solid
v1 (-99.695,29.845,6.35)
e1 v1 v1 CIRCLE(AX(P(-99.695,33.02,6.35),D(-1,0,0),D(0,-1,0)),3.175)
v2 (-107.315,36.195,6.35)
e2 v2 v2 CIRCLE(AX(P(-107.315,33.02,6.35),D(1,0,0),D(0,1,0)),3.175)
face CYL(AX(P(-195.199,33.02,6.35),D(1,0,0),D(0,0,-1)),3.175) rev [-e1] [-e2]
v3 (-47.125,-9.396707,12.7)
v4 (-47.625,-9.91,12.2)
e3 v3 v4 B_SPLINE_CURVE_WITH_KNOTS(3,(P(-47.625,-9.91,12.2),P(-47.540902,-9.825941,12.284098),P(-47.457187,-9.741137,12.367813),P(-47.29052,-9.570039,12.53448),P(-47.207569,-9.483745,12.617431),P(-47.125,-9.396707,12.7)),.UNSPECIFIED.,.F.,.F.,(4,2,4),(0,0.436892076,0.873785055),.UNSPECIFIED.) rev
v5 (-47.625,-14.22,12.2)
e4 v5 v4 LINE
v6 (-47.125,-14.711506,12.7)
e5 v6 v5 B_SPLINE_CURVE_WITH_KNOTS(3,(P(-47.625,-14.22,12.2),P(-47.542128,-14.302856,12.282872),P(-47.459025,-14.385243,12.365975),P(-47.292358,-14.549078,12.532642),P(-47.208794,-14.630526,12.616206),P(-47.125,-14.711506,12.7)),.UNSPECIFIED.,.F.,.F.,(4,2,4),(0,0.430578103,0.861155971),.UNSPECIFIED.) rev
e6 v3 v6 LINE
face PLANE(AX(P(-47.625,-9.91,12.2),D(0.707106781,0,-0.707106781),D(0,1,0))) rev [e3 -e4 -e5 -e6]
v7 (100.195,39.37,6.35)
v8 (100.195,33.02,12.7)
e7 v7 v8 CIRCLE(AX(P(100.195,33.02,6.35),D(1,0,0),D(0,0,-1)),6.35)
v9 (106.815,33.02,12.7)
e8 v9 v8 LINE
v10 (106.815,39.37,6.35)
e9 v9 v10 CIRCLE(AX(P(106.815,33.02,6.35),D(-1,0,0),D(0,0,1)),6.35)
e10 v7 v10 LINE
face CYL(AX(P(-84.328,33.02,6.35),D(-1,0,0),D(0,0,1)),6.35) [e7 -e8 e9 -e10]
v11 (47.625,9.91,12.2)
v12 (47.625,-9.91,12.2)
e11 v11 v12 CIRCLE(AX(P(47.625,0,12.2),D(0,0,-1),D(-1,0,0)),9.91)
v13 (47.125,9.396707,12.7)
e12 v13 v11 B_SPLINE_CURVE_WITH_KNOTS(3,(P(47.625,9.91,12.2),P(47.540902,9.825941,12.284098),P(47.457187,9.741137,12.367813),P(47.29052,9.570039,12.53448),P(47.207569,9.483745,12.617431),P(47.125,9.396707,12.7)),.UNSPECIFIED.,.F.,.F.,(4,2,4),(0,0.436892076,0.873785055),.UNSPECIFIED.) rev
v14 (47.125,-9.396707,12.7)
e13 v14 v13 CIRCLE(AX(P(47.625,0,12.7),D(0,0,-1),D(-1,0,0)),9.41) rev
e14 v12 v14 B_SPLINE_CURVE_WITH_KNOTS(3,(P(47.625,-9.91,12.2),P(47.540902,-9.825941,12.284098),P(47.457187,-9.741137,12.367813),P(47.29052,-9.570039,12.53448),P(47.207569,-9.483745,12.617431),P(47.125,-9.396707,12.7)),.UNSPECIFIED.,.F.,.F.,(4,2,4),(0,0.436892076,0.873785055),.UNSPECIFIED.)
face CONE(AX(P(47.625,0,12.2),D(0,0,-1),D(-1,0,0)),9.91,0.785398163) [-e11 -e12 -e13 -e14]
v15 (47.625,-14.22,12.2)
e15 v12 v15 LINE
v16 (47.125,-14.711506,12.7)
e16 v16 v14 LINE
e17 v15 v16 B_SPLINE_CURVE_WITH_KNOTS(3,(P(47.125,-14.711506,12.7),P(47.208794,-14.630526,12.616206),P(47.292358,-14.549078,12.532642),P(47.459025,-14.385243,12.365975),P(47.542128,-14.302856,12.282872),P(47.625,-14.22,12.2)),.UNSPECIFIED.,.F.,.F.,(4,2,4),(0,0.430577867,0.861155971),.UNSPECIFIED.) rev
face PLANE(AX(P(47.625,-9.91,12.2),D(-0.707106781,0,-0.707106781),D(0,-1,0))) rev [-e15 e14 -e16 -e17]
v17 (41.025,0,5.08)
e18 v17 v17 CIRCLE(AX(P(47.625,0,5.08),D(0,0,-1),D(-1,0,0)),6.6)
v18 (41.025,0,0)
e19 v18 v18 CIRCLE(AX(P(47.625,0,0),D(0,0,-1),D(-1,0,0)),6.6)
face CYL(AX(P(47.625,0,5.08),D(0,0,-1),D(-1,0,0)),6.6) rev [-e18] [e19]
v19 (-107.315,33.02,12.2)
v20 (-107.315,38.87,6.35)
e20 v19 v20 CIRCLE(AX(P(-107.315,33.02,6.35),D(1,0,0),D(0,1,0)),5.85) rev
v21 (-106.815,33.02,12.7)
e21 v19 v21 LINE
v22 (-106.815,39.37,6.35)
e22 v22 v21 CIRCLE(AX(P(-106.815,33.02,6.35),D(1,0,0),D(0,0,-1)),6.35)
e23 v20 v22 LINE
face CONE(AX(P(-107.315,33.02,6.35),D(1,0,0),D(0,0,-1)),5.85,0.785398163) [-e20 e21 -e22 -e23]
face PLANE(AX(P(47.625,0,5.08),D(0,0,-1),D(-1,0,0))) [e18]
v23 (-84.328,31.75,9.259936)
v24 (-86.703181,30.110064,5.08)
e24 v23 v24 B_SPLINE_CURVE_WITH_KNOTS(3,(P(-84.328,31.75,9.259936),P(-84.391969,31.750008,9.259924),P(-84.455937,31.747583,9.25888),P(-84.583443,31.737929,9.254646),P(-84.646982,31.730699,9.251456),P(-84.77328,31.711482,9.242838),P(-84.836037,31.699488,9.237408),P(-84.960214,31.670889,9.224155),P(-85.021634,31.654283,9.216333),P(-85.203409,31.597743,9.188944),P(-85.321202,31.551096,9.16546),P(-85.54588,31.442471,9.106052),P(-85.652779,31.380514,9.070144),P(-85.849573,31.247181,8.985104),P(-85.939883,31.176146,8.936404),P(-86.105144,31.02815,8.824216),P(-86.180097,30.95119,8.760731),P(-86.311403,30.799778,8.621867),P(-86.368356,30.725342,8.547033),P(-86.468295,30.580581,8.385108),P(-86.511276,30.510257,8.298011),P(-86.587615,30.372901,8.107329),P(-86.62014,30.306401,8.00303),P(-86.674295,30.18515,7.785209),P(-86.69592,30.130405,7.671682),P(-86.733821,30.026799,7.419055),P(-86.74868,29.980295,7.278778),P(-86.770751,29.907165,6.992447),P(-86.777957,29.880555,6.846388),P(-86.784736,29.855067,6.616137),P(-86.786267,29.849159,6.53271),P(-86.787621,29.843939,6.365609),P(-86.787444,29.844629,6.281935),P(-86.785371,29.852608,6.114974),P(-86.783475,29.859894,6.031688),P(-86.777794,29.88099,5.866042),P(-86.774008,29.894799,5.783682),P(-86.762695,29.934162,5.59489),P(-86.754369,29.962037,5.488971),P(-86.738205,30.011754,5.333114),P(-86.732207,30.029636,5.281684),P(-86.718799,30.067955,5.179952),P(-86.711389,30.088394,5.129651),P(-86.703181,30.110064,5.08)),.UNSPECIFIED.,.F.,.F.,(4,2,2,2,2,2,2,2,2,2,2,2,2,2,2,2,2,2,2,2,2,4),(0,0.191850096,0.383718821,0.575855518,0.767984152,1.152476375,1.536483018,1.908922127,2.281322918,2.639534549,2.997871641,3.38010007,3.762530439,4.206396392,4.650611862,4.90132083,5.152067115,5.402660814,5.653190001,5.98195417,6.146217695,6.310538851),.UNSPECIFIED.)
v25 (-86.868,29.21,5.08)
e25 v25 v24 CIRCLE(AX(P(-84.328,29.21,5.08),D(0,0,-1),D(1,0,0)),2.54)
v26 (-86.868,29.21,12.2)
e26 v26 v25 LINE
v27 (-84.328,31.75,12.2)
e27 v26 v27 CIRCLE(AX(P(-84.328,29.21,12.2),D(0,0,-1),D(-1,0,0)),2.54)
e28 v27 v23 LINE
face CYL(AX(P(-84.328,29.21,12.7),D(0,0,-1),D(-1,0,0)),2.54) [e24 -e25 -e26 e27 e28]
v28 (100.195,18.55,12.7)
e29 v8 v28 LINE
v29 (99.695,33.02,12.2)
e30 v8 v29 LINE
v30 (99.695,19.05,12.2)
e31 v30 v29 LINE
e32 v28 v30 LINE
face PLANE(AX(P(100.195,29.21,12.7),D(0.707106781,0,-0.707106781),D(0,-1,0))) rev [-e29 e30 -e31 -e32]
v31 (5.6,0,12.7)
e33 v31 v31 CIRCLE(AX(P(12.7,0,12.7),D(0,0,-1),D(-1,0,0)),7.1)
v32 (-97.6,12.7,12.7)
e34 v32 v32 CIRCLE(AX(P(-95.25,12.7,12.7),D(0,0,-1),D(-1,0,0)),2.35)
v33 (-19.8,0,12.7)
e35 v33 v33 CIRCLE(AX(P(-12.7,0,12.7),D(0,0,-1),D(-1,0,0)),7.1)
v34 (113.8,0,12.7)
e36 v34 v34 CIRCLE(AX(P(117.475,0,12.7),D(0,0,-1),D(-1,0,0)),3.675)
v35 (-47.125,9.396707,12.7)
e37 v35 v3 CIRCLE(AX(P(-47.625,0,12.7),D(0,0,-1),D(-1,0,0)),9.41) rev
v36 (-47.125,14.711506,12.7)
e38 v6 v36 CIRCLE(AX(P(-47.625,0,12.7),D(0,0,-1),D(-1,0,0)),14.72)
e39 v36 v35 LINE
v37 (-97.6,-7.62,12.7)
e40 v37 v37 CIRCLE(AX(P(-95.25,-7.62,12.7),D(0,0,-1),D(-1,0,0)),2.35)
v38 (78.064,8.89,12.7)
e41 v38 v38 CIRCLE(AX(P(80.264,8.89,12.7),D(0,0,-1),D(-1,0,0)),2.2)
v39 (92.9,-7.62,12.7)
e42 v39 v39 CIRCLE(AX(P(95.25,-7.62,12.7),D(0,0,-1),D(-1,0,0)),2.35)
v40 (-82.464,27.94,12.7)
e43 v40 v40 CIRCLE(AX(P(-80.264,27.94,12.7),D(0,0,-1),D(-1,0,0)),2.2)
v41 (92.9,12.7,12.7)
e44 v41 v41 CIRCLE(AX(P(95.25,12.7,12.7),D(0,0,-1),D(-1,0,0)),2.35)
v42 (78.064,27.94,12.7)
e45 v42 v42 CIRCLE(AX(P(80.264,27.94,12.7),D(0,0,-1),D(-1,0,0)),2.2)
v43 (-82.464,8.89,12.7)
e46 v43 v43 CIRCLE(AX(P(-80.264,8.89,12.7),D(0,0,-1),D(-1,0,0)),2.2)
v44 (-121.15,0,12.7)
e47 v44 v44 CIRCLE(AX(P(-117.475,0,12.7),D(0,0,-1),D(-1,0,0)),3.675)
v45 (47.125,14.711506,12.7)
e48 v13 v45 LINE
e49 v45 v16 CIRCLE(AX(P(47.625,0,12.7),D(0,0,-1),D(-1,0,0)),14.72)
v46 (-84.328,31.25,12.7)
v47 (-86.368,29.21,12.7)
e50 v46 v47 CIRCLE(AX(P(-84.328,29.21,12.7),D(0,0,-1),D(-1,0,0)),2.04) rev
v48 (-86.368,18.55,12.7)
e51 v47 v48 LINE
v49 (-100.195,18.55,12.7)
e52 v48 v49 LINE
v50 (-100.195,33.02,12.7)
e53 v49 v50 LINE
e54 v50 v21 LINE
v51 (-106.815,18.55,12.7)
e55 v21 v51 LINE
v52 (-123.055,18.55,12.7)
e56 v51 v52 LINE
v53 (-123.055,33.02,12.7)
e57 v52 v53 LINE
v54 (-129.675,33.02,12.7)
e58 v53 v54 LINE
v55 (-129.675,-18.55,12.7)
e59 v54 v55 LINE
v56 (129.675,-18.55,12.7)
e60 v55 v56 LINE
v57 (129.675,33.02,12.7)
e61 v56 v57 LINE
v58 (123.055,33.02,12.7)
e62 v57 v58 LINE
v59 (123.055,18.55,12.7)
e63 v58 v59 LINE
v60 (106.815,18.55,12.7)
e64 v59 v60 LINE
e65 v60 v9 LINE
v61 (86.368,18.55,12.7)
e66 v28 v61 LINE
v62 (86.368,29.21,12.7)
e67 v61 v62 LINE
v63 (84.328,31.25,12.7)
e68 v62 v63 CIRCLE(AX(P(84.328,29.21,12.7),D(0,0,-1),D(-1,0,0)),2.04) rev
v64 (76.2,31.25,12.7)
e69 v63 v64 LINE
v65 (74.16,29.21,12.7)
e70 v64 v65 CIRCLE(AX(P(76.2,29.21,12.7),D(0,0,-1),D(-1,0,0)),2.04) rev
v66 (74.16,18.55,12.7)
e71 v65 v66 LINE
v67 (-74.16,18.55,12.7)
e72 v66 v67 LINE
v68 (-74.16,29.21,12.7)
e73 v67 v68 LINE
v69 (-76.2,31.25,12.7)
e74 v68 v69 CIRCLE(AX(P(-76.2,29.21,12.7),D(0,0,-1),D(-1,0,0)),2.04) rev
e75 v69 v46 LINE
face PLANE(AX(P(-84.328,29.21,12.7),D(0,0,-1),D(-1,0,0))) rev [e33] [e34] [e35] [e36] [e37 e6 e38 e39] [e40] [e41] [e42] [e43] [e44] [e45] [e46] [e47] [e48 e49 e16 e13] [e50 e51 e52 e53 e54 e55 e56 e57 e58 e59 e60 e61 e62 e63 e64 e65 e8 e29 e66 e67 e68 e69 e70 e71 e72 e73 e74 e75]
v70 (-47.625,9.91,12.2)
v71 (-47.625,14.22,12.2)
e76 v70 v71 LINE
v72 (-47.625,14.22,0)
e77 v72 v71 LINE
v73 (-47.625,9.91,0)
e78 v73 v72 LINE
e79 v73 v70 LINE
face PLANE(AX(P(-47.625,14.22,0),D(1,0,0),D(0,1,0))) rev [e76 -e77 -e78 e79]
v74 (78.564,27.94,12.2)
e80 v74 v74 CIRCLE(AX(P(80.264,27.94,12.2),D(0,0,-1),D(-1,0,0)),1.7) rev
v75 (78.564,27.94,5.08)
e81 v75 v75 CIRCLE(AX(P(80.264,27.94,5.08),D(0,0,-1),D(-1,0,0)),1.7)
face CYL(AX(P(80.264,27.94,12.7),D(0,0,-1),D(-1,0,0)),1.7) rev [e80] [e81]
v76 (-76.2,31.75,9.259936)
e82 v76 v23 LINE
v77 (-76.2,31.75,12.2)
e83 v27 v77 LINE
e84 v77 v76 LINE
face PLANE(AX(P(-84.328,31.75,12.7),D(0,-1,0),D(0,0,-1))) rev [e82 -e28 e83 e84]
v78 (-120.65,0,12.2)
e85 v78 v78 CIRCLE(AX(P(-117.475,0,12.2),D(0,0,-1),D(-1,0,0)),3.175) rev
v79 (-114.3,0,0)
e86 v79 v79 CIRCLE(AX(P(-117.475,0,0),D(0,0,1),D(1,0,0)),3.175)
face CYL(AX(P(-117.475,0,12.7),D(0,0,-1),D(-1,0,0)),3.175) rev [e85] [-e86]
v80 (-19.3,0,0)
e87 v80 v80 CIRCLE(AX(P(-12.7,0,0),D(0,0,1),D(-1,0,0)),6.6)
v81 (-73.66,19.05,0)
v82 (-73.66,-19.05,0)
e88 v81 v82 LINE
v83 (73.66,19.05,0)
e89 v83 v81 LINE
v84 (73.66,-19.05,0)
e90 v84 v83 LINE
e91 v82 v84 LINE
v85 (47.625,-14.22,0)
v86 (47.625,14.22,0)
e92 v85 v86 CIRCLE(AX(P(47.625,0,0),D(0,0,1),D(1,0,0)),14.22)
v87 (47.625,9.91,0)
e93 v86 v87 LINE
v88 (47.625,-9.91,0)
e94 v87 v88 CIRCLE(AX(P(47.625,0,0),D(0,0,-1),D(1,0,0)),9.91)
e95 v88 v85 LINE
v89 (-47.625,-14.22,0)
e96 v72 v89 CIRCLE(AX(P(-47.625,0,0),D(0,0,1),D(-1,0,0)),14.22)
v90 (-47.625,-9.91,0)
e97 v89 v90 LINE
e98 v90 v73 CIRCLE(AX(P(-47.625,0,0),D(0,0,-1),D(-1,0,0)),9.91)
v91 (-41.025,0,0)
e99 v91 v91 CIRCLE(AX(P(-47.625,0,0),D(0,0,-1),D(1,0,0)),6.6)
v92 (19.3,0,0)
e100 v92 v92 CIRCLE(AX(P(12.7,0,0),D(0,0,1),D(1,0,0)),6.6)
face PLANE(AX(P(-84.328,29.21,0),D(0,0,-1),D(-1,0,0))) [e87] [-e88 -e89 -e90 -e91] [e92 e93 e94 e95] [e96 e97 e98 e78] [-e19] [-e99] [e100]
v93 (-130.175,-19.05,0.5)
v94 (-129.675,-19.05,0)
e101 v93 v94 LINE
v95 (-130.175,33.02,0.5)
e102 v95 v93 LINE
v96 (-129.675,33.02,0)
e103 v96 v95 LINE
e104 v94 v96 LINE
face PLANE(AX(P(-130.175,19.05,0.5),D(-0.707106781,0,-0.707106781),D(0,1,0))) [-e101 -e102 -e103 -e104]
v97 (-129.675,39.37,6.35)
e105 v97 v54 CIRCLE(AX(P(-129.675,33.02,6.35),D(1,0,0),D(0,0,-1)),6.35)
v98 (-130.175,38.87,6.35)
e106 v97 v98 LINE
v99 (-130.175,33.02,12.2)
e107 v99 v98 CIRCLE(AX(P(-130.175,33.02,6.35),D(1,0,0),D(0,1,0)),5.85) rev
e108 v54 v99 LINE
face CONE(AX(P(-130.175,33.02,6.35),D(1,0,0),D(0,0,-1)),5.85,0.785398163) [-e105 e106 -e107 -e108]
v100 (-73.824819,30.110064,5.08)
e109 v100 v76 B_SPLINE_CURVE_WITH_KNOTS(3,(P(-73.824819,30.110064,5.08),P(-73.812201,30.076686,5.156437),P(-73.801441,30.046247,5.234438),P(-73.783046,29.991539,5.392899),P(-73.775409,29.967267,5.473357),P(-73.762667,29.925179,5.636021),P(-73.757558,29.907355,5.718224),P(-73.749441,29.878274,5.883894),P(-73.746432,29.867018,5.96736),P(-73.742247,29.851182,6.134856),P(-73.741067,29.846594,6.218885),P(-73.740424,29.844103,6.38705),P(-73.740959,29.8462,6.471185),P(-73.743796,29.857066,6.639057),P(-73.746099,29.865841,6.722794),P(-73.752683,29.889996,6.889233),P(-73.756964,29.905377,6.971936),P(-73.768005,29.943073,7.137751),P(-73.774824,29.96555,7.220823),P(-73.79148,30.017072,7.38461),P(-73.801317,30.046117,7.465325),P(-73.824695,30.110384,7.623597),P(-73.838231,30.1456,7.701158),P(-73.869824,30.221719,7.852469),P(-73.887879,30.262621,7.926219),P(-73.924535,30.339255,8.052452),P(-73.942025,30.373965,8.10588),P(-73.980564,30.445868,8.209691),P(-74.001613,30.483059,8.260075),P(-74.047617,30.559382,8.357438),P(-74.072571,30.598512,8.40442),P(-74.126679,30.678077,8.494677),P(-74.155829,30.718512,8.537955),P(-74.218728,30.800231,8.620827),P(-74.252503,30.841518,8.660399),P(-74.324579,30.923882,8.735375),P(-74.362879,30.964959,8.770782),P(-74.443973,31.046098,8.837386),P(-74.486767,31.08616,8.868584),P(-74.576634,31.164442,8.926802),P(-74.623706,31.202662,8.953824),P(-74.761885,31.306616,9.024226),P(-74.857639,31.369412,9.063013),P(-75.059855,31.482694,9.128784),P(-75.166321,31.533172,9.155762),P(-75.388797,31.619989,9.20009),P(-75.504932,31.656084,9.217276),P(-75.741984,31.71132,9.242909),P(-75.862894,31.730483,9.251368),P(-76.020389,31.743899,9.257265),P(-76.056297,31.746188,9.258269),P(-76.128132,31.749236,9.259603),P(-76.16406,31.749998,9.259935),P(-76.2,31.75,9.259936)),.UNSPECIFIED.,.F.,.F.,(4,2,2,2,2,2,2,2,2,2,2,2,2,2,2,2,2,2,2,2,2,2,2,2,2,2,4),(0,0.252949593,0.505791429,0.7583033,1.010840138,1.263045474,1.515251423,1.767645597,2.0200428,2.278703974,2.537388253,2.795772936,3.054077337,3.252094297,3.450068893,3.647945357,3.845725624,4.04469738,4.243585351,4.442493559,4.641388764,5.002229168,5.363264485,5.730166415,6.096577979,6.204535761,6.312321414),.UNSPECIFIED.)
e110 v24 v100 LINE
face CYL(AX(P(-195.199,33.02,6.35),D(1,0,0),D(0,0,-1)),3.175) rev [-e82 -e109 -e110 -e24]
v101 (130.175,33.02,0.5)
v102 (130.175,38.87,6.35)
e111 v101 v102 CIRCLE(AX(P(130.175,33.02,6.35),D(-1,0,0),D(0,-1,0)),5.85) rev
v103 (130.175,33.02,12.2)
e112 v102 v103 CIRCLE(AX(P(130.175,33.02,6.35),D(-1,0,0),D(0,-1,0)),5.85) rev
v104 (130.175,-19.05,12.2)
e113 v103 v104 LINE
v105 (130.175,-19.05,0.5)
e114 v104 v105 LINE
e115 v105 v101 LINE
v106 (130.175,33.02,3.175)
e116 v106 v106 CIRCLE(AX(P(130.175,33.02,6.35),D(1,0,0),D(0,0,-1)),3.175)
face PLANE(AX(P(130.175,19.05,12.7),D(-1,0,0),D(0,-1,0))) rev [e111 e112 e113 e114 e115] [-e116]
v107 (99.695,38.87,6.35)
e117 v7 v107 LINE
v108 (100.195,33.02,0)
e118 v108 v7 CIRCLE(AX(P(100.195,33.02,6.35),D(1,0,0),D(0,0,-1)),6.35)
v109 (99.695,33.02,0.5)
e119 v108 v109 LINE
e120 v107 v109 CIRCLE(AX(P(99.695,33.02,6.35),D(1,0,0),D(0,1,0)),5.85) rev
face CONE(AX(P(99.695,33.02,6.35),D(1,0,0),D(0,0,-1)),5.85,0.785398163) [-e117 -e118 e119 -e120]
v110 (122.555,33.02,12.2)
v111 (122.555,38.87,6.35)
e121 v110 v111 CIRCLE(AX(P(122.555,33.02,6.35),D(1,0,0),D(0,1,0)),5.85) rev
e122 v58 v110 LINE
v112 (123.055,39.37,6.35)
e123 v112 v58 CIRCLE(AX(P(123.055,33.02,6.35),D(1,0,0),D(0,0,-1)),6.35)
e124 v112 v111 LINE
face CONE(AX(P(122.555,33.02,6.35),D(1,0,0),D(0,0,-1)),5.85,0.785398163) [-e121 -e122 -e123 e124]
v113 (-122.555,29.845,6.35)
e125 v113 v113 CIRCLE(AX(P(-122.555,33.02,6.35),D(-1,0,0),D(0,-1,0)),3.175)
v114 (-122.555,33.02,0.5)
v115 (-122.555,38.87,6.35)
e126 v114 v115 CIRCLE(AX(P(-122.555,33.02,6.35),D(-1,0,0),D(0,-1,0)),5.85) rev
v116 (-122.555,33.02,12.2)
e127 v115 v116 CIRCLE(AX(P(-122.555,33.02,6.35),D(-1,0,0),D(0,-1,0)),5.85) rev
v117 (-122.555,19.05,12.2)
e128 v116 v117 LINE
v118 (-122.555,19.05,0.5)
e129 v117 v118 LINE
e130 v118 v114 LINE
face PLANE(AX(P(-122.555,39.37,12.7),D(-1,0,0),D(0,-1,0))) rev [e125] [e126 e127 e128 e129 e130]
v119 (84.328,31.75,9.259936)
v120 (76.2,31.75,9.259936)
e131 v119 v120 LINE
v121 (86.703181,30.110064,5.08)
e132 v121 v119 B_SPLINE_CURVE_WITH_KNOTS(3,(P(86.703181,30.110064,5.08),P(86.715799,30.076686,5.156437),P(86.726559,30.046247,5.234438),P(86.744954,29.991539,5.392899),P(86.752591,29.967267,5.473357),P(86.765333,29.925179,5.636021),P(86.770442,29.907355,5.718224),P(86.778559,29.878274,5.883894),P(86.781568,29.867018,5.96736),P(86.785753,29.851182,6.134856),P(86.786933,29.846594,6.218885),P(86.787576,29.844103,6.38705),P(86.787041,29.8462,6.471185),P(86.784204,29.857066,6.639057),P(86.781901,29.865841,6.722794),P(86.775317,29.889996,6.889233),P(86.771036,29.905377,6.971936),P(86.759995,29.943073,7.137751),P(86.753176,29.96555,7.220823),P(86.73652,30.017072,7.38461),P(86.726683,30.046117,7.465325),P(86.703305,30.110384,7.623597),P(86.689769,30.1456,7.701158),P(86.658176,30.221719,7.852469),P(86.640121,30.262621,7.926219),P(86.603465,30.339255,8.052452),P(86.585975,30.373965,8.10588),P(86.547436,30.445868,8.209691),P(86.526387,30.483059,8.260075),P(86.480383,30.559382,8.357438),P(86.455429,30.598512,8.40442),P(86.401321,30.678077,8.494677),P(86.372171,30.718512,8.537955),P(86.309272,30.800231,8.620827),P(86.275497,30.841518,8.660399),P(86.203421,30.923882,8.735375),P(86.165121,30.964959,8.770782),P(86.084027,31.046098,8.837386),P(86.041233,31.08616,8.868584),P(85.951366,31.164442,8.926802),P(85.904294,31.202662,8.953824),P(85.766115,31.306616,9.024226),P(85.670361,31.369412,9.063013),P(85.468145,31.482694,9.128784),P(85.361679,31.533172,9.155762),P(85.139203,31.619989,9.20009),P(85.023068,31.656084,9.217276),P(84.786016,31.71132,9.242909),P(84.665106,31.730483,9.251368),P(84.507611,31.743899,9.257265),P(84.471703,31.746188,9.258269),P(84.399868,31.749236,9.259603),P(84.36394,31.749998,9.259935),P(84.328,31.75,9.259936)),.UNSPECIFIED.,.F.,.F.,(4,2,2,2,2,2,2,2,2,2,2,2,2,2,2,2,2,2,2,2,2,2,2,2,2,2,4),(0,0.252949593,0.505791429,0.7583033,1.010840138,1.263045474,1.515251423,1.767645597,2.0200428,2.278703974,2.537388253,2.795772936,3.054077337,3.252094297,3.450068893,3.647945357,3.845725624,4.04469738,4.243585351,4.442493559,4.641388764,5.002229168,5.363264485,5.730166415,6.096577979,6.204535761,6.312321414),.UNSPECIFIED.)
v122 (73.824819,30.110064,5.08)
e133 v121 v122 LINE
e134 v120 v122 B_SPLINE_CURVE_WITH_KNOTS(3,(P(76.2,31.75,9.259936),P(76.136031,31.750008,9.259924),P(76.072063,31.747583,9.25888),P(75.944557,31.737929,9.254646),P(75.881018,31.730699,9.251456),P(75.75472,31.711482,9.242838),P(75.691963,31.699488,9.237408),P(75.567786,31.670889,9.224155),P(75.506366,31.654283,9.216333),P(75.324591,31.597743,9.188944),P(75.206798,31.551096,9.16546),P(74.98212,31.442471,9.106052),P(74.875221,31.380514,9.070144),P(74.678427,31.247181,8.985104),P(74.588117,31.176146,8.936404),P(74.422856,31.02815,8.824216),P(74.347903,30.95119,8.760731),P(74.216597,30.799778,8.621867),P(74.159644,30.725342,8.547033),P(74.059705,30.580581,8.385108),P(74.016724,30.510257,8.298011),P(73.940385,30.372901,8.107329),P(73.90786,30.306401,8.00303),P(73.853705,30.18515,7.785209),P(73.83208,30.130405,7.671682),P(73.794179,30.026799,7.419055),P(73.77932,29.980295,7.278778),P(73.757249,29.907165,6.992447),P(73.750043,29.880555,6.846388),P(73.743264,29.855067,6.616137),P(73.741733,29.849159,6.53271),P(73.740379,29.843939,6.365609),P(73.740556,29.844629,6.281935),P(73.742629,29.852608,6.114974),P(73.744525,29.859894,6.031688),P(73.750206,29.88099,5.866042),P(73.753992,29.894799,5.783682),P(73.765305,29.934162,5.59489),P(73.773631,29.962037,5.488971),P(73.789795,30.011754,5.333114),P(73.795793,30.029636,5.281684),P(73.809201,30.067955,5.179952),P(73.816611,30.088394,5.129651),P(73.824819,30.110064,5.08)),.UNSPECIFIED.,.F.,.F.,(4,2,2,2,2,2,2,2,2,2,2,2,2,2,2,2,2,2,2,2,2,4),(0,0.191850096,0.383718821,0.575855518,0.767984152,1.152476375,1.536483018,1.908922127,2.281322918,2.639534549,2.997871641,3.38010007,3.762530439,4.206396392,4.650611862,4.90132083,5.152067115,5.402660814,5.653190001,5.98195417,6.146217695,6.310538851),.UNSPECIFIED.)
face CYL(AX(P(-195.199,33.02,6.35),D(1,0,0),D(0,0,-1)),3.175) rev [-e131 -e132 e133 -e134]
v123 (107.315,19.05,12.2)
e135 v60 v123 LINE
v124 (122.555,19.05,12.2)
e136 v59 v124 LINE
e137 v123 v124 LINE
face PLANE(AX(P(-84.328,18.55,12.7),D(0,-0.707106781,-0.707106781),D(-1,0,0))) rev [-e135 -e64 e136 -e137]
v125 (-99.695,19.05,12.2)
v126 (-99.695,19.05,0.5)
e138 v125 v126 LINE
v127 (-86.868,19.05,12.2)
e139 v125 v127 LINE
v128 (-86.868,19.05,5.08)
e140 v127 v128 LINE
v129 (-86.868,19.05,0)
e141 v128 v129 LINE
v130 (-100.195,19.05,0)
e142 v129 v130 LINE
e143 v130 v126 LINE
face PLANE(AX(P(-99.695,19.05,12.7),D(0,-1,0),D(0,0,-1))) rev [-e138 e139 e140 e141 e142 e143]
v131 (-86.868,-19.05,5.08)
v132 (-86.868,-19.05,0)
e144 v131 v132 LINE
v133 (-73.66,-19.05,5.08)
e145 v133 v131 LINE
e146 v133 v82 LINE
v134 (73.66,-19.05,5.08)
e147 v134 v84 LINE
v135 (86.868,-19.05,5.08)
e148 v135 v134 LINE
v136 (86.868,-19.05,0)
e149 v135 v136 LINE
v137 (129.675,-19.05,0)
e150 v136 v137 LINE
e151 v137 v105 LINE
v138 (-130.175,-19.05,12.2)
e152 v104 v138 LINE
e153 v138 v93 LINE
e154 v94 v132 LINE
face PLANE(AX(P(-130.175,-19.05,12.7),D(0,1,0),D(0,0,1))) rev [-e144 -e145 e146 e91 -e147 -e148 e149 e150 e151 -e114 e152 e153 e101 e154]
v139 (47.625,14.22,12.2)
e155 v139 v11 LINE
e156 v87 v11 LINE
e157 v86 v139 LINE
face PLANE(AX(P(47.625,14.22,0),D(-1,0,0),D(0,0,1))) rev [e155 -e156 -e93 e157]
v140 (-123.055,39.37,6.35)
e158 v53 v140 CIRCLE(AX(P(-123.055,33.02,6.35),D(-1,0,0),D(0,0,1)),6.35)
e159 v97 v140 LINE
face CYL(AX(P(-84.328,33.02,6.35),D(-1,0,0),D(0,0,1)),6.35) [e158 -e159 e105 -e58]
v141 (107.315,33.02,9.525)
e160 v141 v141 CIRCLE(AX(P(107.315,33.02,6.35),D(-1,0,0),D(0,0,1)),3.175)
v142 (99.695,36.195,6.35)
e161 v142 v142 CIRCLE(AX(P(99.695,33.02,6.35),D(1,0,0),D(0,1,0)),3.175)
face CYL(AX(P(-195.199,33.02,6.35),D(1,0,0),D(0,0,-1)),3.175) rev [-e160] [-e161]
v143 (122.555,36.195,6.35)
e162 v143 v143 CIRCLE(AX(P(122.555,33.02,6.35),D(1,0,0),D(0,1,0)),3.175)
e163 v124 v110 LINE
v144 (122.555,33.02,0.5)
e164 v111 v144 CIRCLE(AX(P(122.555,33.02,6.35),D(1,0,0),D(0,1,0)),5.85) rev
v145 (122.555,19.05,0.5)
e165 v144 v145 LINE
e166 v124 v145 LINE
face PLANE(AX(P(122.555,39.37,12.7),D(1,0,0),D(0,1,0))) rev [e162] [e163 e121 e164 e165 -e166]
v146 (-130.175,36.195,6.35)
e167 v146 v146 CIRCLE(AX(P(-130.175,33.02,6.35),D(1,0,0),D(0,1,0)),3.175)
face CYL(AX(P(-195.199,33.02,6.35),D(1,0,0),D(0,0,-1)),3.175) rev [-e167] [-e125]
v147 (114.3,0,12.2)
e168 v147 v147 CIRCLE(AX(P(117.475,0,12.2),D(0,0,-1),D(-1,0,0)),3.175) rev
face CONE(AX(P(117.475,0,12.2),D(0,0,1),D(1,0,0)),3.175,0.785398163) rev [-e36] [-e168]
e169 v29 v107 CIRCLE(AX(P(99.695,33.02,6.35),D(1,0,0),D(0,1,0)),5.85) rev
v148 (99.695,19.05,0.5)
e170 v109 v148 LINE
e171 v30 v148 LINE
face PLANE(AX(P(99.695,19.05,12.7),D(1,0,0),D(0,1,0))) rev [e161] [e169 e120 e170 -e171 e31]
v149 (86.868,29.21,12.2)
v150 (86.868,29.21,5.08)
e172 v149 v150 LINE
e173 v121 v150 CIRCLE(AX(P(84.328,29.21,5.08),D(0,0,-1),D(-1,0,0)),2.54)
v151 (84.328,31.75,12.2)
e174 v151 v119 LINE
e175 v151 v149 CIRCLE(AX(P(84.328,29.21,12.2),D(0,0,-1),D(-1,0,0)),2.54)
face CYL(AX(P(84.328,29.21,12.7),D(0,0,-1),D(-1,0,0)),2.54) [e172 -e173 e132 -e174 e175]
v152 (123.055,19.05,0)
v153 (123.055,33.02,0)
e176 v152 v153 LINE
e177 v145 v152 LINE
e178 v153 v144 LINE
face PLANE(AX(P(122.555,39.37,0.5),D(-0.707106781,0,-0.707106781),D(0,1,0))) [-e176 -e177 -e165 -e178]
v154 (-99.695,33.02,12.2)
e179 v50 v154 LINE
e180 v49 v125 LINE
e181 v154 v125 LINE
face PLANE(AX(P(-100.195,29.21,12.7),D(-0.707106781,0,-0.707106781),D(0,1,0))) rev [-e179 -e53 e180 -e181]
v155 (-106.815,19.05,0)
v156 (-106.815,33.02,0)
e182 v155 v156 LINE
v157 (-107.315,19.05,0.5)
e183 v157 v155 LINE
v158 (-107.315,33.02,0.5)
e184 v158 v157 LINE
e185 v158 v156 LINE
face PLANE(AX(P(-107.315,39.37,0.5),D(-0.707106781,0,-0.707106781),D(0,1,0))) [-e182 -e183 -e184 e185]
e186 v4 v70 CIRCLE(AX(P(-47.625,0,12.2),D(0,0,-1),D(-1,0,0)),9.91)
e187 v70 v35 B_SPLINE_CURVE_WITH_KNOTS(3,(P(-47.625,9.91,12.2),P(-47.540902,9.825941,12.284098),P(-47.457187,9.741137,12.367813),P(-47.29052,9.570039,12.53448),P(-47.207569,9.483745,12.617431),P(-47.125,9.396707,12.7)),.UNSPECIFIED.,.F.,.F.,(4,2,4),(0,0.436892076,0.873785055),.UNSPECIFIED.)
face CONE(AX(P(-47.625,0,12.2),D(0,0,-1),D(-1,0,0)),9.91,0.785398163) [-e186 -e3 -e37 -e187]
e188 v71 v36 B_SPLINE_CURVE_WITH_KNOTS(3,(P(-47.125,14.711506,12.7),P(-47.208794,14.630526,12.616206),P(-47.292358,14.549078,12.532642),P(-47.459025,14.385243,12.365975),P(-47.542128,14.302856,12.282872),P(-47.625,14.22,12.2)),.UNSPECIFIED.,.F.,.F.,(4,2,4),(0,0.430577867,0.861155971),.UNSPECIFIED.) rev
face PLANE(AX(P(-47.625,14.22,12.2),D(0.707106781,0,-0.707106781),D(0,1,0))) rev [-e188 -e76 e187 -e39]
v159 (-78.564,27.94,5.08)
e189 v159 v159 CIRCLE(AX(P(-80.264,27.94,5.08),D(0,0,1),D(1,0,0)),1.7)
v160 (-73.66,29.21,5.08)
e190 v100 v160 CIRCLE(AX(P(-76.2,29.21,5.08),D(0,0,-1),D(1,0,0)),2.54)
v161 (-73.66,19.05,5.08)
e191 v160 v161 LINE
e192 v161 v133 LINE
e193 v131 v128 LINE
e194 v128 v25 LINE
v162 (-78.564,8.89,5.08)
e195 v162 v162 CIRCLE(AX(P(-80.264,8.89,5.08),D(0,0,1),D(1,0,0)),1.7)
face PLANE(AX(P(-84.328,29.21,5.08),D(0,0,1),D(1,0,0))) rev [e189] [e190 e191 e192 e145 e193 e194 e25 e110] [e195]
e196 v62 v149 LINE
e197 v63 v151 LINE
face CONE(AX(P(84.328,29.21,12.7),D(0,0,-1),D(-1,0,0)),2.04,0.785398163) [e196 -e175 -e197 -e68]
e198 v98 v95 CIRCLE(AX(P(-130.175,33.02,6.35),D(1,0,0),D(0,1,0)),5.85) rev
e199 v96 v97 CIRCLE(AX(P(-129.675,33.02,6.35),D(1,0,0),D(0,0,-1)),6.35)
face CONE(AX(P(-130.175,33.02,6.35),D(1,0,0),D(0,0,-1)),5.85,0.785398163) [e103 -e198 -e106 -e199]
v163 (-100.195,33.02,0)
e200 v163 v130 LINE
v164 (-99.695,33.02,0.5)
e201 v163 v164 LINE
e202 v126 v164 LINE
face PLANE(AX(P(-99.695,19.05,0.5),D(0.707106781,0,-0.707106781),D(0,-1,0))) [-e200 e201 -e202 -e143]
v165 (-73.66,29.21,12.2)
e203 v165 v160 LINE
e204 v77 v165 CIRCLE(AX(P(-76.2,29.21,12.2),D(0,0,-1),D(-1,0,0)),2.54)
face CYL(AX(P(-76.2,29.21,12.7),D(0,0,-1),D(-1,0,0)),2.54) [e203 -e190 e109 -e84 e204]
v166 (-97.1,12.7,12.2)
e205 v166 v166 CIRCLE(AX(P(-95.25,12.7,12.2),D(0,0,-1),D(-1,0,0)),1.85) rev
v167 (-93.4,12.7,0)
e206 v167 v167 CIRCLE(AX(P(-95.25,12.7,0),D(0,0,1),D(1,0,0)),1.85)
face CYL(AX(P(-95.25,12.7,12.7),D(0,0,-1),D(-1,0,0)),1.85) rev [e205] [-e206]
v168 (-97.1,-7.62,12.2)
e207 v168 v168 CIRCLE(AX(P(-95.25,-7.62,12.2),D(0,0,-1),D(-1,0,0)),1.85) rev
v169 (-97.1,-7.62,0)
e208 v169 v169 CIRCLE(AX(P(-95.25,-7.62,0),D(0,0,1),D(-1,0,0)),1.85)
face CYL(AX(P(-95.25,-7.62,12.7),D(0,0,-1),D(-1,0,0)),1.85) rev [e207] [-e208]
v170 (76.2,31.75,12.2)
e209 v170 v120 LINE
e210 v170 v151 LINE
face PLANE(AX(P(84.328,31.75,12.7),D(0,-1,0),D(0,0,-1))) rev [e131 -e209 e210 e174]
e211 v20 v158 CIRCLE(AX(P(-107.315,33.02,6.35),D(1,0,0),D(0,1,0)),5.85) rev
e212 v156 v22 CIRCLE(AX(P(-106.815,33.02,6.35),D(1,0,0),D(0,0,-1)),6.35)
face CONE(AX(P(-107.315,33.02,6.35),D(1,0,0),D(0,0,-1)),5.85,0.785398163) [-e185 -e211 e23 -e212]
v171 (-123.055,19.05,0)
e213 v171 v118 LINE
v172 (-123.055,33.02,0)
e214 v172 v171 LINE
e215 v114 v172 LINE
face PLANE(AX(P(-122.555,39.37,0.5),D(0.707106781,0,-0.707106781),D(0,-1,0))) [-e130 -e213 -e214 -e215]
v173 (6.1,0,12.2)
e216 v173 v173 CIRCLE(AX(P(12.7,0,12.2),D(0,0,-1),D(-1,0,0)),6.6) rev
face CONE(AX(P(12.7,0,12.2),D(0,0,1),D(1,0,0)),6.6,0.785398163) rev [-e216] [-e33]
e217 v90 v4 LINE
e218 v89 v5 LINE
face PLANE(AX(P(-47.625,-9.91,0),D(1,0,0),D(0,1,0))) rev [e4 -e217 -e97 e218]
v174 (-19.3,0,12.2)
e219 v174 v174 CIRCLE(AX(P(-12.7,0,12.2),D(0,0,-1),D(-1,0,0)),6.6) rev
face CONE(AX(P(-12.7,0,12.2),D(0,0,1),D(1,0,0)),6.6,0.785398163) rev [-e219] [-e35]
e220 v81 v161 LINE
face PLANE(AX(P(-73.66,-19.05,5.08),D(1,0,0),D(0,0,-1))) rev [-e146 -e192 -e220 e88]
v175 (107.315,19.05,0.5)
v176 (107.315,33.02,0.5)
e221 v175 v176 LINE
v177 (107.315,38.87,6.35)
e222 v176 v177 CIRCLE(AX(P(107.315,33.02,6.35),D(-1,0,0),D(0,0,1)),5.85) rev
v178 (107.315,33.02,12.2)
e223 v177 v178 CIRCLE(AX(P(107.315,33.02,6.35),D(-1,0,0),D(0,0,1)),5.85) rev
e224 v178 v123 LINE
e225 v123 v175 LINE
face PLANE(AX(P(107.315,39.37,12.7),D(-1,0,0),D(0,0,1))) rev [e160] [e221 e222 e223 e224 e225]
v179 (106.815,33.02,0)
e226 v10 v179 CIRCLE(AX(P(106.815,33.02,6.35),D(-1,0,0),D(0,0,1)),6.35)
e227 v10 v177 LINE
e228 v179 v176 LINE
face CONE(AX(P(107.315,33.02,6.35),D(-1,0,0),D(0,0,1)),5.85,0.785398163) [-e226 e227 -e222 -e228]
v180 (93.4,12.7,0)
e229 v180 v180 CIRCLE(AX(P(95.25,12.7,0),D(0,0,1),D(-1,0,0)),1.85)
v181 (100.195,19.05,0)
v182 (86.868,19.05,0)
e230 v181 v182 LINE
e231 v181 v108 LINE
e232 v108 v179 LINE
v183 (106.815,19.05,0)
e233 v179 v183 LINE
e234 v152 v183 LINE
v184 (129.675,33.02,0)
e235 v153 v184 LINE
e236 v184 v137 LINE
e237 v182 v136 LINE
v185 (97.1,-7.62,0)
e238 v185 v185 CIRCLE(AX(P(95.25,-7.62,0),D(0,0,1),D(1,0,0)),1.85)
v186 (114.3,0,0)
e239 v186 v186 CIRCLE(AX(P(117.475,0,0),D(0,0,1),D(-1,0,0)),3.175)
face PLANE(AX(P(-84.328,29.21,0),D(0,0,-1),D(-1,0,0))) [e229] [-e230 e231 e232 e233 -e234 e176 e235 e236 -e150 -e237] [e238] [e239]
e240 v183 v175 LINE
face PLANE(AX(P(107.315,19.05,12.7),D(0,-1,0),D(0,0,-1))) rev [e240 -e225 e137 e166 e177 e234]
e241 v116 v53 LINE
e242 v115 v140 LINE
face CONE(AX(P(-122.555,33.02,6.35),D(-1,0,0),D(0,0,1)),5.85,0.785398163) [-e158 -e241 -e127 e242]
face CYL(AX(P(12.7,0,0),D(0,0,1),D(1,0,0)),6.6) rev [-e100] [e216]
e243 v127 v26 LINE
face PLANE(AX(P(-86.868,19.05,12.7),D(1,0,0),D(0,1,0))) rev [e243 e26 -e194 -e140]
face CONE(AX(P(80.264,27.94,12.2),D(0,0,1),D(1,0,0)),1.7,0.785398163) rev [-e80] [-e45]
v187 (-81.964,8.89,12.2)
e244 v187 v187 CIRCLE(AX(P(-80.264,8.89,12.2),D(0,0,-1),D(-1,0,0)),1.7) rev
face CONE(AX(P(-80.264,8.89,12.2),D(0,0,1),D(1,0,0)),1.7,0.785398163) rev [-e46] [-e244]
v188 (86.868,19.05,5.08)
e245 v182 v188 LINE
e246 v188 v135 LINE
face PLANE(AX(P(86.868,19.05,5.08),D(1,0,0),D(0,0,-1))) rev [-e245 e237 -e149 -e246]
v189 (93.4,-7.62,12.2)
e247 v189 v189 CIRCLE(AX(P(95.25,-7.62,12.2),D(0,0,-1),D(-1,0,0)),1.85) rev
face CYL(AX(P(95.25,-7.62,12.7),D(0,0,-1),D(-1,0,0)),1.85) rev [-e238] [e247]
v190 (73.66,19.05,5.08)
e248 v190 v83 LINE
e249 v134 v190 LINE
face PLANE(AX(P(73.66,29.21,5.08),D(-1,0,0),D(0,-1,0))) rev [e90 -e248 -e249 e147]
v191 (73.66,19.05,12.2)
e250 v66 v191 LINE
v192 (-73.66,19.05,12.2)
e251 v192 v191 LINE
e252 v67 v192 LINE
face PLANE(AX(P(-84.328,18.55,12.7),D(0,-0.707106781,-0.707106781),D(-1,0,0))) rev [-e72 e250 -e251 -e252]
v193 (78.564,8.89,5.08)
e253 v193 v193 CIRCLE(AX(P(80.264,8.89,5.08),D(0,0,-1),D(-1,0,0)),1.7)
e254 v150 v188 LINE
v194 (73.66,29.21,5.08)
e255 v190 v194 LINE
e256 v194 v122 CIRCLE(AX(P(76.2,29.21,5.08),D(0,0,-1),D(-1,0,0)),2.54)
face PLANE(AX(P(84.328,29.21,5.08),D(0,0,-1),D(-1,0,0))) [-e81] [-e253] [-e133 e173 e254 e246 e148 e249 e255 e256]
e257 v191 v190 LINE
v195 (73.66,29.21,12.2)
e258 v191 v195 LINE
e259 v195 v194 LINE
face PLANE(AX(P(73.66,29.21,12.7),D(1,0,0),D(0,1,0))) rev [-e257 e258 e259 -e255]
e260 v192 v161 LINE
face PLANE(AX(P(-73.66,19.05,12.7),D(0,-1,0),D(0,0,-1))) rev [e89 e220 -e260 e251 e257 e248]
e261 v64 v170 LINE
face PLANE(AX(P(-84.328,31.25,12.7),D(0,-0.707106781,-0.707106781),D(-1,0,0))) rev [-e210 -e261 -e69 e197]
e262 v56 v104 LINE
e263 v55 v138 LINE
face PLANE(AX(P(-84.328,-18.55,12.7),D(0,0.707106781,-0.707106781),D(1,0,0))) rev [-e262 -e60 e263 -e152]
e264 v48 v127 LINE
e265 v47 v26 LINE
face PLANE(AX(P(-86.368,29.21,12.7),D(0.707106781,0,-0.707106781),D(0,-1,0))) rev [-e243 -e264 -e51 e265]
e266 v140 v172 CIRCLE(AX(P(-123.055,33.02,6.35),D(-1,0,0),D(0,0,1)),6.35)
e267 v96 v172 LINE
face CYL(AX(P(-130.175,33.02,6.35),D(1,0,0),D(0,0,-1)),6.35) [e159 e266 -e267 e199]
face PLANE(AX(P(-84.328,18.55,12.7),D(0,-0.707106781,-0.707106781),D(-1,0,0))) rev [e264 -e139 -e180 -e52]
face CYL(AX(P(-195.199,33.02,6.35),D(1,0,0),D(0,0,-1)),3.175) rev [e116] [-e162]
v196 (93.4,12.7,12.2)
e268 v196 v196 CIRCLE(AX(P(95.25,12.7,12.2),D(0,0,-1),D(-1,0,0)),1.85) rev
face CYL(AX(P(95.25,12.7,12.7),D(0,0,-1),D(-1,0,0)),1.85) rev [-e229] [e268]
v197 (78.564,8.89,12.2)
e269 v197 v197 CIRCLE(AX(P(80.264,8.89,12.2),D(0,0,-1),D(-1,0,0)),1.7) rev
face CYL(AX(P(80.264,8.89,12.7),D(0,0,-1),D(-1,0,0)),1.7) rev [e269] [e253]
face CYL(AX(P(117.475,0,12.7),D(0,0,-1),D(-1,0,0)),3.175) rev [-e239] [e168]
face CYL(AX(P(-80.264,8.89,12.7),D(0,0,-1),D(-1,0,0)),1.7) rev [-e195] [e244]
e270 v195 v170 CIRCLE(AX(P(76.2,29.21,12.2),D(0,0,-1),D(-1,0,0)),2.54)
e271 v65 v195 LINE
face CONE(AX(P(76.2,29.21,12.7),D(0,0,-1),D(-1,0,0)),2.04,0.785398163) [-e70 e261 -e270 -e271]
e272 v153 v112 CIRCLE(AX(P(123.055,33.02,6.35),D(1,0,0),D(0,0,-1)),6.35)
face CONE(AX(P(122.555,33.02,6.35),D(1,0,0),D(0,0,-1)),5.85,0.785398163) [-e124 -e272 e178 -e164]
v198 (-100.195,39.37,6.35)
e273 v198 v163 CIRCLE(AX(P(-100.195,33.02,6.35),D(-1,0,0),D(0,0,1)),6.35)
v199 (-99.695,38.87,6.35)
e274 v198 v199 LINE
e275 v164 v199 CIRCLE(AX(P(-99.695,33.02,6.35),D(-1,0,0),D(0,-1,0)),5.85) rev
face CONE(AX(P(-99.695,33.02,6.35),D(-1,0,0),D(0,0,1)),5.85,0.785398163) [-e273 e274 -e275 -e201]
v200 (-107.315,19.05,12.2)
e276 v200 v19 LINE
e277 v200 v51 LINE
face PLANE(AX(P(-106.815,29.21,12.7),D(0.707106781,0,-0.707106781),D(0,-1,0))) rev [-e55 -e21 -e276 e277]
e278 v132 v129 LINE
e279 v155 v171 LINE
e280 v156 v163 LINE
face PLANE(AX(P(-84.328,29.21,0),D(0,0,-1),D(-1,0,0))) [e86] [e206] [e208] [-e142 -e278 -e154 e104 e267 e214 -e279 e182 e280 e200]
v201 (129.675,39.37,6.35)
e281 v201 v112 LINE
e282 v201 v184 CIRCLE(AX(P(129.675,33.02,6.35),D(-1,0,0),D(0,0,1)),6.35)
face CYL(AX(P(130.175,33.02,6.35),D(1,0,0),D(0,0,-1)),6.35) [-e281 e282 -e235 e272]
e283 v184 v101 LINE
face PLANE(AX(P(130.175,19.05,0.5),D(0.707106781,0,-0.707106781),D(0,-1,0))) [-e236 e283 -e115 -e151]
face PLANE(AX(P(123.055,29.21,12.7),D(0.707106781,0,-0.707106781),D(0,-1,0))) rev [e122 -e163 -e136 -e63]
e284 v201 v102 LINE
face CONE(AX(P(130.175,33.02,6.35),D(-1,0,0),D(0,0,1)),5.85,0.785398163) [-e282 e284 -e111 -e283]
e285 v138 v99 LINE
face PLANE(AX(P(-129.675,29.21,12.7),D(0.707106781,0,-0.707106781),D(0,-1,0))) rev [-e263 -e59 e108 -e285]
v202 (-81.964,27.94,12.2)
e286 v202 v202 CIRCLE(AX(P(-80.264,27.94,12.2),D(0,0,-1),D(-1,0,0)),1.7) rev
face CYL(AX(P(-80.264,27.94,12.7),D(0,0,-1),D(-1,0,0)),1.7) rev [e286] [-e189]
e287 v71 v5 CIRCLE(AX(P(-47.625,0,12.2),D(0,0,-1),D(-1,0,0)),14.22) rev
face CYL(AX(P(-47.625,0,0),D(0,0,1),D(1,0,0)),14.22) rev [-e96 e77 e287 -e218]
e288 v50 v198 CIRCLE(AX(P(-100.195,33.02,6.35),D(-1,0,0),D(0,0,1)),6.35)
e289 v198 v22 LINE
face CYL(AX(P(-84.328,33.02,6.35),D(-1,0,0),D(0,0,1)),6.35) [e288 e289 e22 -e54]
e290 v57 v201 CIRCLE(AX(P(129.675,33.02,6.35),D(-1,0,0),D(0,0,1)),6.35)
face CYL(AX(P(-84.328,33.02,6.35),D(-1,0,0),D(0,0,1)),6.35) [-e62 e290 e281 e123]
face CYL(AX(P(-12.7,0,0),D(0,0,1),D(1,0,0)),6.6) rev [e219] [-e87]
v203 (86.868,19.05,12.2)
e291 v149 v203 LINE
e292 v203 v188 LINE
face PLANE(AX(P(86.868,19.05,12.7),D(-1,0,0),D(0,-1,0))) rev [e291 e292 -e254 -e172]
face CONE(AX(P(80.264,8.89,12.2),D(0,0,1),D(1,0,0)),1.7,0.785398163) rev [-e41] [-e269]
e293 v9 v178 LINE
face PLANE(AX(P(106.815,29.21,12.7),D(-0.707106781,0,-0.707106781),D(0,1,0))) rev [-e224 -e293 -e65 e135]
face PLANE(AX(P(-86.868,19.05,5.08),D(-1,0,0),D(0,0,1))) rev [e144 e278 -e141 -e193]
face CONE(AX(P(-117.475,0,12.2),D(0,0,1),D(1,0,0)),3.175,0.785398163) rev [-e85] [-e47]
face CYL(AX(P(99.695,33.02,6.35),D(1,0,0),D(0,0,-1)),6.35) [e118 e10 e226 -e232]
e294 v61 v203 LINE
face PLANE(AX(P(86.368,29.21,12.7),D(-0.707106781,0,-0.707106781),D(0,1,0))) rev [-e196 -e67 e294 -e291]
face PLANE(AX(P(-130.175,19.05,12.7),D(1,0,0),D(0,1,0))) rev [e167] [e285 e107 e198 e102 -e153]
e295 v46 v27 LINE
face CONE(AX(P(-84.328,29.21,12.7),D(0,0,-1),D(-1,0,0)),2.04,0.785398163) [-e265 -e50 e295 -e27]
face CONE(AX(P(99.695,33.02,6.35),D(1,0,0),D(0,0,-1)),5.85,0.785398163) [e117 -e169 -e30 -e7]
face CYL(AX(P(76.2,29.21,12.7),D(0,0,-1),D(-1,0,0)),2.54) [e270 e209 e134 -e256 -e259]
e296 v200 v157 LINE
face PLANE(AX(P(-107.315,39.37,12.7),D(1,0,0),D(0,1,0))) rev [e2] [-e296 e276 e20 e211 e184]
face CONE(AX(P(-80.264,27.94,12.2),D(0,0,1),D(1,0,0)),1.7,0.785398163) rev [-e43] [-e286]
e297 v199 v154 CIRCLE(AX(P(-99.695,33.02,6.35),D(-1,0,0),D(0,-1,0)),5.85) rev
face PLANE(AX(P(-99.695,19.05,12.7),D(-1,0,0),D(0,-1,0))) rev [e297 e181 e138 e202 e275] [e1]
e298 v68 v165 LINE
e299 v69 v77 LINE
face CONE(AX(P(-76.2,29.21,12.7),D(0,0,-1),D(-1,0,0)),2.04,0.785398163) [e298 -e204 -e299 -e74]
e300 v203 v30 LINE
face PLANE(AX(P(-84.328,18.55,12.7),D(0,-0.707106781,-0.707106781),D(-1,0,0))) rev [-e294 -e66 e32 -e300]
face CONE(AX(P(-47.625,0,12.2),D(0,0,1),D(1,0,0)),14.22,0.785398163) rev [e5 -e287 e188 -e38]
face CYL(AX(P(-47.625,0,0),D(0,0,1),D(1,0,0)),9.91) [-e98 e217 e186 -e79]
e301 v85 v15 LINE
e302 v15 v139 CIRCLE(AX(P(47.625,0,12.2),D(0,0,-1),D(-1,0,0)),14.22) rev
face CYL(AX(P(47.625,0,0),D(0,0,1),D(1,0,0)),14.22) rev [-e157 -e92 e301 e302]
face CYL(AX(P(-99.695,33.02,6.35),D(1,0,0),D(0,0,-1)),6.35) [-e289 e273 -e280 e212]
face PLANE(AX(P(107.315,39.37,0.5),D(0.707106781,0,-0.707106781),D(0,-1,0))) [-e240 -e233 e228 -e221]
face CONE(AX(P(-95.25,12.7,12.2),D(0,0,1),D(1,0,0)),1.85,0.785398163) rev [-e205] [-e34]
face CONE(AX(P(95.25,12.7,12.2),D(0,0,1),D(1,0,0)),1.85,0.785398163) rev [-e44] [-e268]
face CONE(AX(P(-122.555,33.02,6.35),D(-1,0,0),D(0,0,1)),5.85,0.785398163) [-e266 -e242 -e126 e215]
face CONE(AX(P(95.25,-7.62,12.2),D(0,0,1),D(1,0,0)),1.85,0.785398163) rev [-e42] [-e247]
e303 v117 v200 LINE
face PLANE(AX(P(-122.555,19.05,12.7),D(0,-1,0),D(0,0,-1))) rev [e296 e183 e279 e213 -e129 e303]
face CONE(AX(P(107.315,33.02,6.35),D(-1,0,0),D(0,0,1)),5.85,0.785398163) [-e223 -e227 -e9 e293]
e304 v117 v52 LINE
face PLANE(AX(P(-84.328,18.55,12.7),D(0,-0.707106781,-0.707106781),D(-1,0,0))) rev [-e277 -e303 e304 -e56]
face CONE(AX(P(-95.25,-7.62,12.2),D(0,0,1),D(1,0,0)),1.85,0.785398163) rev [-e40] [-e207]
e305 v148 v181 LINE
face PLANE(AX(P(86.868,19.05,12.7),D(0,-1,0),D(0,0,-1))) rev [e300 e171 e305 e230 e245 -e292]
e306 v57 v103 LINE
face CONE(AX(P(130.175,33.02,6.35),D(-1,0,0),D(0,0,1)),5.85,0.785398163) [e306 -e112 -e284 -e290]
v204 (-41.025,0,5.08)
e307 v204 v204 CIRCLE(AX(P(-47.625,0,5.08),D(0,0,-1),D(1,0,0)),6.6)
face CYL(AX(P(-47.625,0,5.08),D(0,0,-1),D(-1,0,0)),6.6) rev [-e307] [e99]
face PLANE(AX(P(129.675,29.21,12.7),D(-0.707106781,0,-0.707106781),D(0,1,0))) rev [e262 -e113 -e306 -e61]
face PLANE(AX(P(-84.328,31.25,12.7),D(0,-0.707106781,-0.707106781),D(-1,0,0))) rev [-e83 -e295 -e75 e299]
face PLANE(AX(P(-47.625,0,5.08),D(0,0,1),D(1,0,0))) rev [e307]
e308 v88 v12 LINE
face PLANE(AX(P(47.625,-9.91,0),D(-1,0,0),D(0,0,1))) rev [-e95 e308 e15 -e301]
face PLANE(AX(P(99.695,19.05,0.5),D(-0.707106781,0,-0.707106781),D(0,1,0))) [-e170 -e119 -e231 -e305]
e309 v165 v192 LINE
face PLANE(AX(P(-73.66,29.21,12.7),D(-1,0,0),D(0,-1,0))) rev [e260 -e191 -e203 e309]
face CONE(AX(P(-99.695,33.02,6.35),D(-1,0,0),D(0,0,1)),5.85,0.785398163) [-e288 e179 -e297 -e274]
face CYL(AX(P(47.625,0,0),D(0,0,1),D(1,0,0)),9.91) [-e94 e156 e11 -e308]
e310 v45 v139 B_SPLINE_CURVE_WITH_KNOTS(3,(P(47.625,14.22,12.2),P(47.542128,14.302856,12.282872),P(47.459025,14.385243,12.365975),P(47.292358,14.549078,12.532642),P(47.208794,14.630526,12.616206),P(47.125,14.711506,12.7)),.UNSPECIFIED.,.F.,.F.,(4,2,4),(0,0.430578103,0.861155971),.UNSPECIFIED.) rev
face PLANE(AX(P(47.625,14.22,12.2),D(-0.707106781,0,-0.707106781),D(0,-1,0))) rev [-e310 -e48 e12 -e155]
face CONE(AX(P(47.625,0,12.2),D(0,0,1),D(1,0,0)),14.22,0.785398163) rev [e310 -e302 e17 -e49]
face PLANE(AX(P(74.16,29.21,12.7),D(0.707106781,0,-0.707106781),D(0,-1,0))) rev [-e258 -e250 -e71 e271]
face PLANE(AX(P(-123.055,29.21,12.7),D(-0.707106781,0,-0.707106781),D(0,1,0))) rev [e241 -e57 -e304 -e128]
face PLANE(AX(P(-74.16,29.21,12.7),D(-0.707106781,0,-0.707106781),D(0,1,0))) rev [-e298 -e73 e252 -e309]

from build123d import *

# Parameters (mm, degrees)
SKETCH1_R           = 3.175
SKETCH1_R_2         = 1.7
SKETCH1_R_3         = 1.85
BOSS_EXTRUDE1_DEPTH = 12.7
SKETCH2_R           = 6.6
CUT_EXTRUDE1_DEPTH  = 5.08
FILLET1_R           = 6.35
SKETCH3_R           = 3.175
CUT_EXTRUDE2_DEPTH  = 325.374
SKETCH4_R           = 6.6
CUT_EXTRUDE3_DEPTH  = 12.7
CHAMFER1_SIZE       = 0.5


with BuildPart() as part:
    # Sketch1 → Boss-Extrude1 (new body)
    with BuildSketch(Plane.XY):
        with BuildLine():
            Line((-122.555, 19.05), (-107.315, 19.05))
            Line((-107.315, 19.05), (-107.315, 39.37))
            Line((-107.315, 39.37), (-99.695, 39.37))
            Line((-99.695, 39.37), (-99.695, 19.05))
            Line((-99.695, 19.05), (-86.868, 19.05))
            Line((-86.868, 19.05), (-86.868, 29.21))
            ThreePointArc((-86.868, 29.21), (-86.124051224, 31.006051224), (-84.328, 31.75))
            Line((-84.328, 31.75), (-76.2, 31.75))
            ThreePointArc((-76.2, 31.75), (-74.403948776, 31.006051224), (-73.66, 29.21))
            Line((-73.66, 29.21), (-73.66, 19.05))
            Line((-73.66, 19.05), (73.66, 19.05))
            Line((73.66, 19.05), (73.66, 29.21))
            ThreePointArc((73.66, 29.21), (74.403948776, 31.006051224), (76.2, 31.75))
            Line((76.2, 31.75), (84.328, 31.75))
            ThreePointArc((84.328, 31.75), (86.124051224, 31.006051224), (86.868, 29.21))
            Line((86.868, 29.21), (86.868, 19.05))
            Line((86.868, 19.05), (99.695, 19.05))
            Line((99.695, 19.05), (99.695, 39.37))
            Line((99.695, 39.37), (107.315, 39.37))
            Line((107.315, 39.37), (107.315, 19.05))
            Line((107.315, 19.05), (122.555, 19.05))
            Line((122.555, 19.05), (122.555, 39.37))
            Line((122.555, 39.37), (130.175, 39.37))
            Line((130.175, 39.37), (130.175, 19.05))
            Line((130.175, 19.05), (130.175, -19.05))
            Line((130.175, -19.05), (-130.175, -19.05))
            Line((-130.175, -19.05), (-130.175, 19.05))
            Line((-130.175, 19.05), (-130.175, 39.37))
            Line((-130.175, 39.37), (-122.555, 39.37))
            Line((-122.555, 39.37), (-122.555, 19.05))
        make_face()
        with Locations((-117.475, 0)):
            Circle(SKETCH1_R, mode=Mode.SUBTRACT)
        with Locations(Location((117.475, 0, 0), (0, 0, 180))):
            Circle(SKETCH1_R, mode=Mode.SUBTRACT)
        with Locations((-80.264, 27.94)):
            Circle(SKETCH1_R_2, mode=Mode.SUBTRACT)
        with Locations((-80.264, 8.89)):
            Circle(SKETCH1_R_2, mode=Mode.SUBTRACT)
        with Locations(Location((80.264, 8.89, 0), (0, 0, 180))):
            Circle(SKETCH1_R_2, mode=Mode.SUBTRACT)
        with Locations(Location((80.264, 27.94, 0), (0, 0, 180))):
            Circle(SKETCH1_R_2, mode=Mode.SUBTRACT)
        with Locations((-95.25, 12.7)):
            Circle(SKETCH1_R_3, mode=Mode.SUBTRACT)
        with Locations(Location((-95.25, -7.62, 0), (0, 0, 180))):
            Circle(SKETCH1_R_3, mode=Mode.SUBTRACT)
        with Locations((95.25, -7.62)):
            Circle(SKETCH1_R_3, mode=Mode.SUBTRACT)
        with Locations(Location((95.25, 12.7, 0), (0, 0, 180))):
            Circle(SKETCH1_R_3, mode=Mode.SUBTRACT)
    extrude(amount=BOSS_EXTRUDE1_DEPTH)

    # Sketch2 → Cut-Extrude1 (cut)
    with BuildSketch(Plane(origin=(0, 0, 0), x_dir=(-1, 0, 0), z_dir=(0, 0, -1))):
        with Locations((-47.625, 0)):
            Circle(SKETCH2_R)
        with Locations(Location((47.625, 0, 0), (0, 0, 180))):
            Circle(SKETCH2_R)
        with BuildLine():
            Line((-73.66, 29.21), (-73.66, 19.05))
            Line((-73.66, 19.05), (-73.66, -19.05))
            Line((-73.66, -19.05), (-86.868, -19.05))
            Line((-86.868, -19.05), (-86.868, 19.05))
            Line((-86.868, 19.05), (-86.868, 29.21))
            ThreePointArc((-86.868, 29.21), (-86.124051224, 31.006051224), (-84.328, 31.75))
            Line((-84.328, 31.75), (-76.2, 31.75))
            ThreePointArc((-76.2, 31.75), (-74.403948776, 31.006051224), (-73.66, 29.21))
        make_face()
        with BuildLine():
            Line((73.66, -19.05), (73.66, 19.05))
            Line((73.66, 19.05), (73.66, 29.21))
            ThreePointArc((73.66, 29.21), (74.403948776, 31.006051224), (76.2, 31.75))
            Line((76.2, 31.75), (84.328, 31.75))
            ThreePointArc((84.328, 31.75), (86.124051224, 31.006051224), (86.868, 29.21))
            Line((86.868, 29.21), (86.868, 19.05))
            Line((86.868, 19.05), (86.868, -19.05))
            Line((86.868, -19.05), (73.66, -19.05))
        make_face()
    extrude(amount=-CUT_EXTRUDE1_DEPTH, mode=Mode.SUBTRACT)

    # Fillet1
    fillet1_edges = [part.edges().sort_by_distance(p)[0] for p in [
        (-126.365, 39.37, 0),
        (-126.365, 39.37, 12.7),
        (-103.505, 39.37, 12.7),
        (-103.505, 39.37, 0),
        (103.505, 39.37, 0),
        (103.505, 39.37, 12.7),
        (126.365, 39.37, 12.7),
        (126.365, 39.37, 0),
    ]]
    fillet(fillet1_edges, radius=FILLET1_R - 0.0001)  # a hair under: the kernel refuses the full size

    # Sketch3 → Cut-Extrude2 (cut)
    with BuildSketch(Plane(origin=(130.175, 0, 0), x_dir=(0, 0, -1), z_dir=(1, 0, 0))):
        with Locations(Location((-6.35, 33.02, 0), (0, 0, 90))):
            Circle(SKETCH3_R)
    extrude(amount=-CUT_EXTRUDE2_DEPTH, mode=Mode.SUBTRACT)

    # Sketch4 → Cut-Extrude3 (cut)
    with BuildSketch(Plane.XY.offset(12.7)):
        with Locations((12.7, 0)):
            Circle(SKETCH4_R)
        with Locations(Location((-12.7, 0, 0), (0, 0, 180))):
            Circle(SKETCH4_R)
        with BuildLine():
            Line((47.625, 14.22), (47.625, 9.91))
            ThreePointArc((47.625, 9.91), (57.535, 0), (47.625, -9.91))
            Line((47.625, -9.91), (47.625, -14.22))
            ThreePointArc((47.625, -14.22), (61.845, 0), (47.625, 14.22))
        make_face()
        with BuildLine():
            Line((-47.625, -9.91), (-47.625, -14.22))
            ThreePointArc((-47.625, -14.22), (-61.845, 0), (-47.625, 14.22))
            Line((-47.625, 14.22), (-47.625, 9.91))
            ThreePointArc((-47.625, 9.91), (-57.535, 0), (-47.625, -9.91))
        make_face()
    extrude(amount=-CUT_EXTRUDE3_DEPTH, mode=Mode.SUBTRACT)

    # Chamfer1
    chamfer1_edges = [part.edges().sort_by_distance(p)[0] for p in [
        (-97.1, 12.7, 12.7),
        (-114.935, 19.05, 12.7),
        (93.4, -7.62, 12.7),
        (-122.555, 26.03505, 12.7),
        (97.1, 12.7, 12.7),
        (0, -19.05, 12.7),
        (-130.175, 6.98505, 0),
        (-130.175, 6.98505, 12.7),
        (-130.175, 37.51015735, 10.84015735),
        (-130.175, 37.51015735, 1.85984265),
        (-107.315, 26.03505, 0),
        (-122.555, 37.51015735, 10.84015735),
        (-122.555, 37.51015735, 1.85984265),
        (122.555, 26.03505, 12.7),
        (99.695, 26.03505, 12.7),
        (-107.315, 26.03505, 12.7),
        (-107.315, 37.51015735, 1.85984265),
        (-107.315, 37.51015735, 10.84015735),
        (-99.695, 37.51015735, 1.85984265),
        (-99.695, 37.51015735, 10.84015735),
        (114.935, 19.05, 12.7),
        (99.695, 26.03505, 0),
        (99.695, 37.51015735, 10.84015735),
        (99.695, 37.51015735, 1.85984265),
        (122.555, 26.03505, 0),
        (107.315, 37.51015735, 10.84015735),
        (107.315, 37.51015735, 1.85984265),
        (122.555, 37.51015735, 1.85984265),
        (122.555, 37.51015735, 10.84015735),
        (130.175, 37.51015735, 1.85984265),
        (130.175, 37.51015735, 10.84015735),
        (107.315, 26.03505, 12.7),
        (57.535, 0, 12.7),
        (47.625, -12.065, 12.7),
        (61.845, 0, 12.7),
        (47.625, 12.065, 12.7),
        (-57.535, 0, 12.7),
        (-47.625, 12.065, 12.7),
        (-61.845, 0, 12.7),
        (-47.625, -12.065, 12.7),
        (-6.1, 0, 12.7),
        (6.1, 0, 12.7),
        (-122.555, 26.03505, 0),
        (-99.695, 26.03505, 0),
        (93.2815, 19.05, 12.7),
        (107.315, 26.03505, 0),
        (130.175, 6.98505, 0),
        (86.868, 24.13, 12.7),
        (86.124051224, 31.006051224, 12.7),
        (80.264, 31.75, 12.7),
        (130.175, 6.98505, 12.7),
        (74.403948776, 31.006051224, 12.7),
        (73.66, 24.13, 12.7),
        (0, 19.05, 12.7),
        (-73.66, 24.13, 12.7),
        (-74.403948776, 31.006051224, 12.7),
        (-80.264, 31.75, 12.7),
        (-120.65, 0, 12.7),
        (-86.124051224, 31.006051224, 12.7),
        (120.65, 0, 12.7),
        (-86.868, 24.13, 12.7),
        (-81.964, 27.94, 12.7),
        (-93.2815, 19.05, 12.7),
        (-81.964, 8.89, 12.7),
        (81.964, 8.89, 12.7),
        (-99.695, 26.03505, 12.7),
        (81.964, 27.94, 12.7),
        (-93.4, -7.62, 12.7),
    ]]
    chamfer(chamfer1_edges, length=CHAMFER1_SIZE)


solid = part.part
